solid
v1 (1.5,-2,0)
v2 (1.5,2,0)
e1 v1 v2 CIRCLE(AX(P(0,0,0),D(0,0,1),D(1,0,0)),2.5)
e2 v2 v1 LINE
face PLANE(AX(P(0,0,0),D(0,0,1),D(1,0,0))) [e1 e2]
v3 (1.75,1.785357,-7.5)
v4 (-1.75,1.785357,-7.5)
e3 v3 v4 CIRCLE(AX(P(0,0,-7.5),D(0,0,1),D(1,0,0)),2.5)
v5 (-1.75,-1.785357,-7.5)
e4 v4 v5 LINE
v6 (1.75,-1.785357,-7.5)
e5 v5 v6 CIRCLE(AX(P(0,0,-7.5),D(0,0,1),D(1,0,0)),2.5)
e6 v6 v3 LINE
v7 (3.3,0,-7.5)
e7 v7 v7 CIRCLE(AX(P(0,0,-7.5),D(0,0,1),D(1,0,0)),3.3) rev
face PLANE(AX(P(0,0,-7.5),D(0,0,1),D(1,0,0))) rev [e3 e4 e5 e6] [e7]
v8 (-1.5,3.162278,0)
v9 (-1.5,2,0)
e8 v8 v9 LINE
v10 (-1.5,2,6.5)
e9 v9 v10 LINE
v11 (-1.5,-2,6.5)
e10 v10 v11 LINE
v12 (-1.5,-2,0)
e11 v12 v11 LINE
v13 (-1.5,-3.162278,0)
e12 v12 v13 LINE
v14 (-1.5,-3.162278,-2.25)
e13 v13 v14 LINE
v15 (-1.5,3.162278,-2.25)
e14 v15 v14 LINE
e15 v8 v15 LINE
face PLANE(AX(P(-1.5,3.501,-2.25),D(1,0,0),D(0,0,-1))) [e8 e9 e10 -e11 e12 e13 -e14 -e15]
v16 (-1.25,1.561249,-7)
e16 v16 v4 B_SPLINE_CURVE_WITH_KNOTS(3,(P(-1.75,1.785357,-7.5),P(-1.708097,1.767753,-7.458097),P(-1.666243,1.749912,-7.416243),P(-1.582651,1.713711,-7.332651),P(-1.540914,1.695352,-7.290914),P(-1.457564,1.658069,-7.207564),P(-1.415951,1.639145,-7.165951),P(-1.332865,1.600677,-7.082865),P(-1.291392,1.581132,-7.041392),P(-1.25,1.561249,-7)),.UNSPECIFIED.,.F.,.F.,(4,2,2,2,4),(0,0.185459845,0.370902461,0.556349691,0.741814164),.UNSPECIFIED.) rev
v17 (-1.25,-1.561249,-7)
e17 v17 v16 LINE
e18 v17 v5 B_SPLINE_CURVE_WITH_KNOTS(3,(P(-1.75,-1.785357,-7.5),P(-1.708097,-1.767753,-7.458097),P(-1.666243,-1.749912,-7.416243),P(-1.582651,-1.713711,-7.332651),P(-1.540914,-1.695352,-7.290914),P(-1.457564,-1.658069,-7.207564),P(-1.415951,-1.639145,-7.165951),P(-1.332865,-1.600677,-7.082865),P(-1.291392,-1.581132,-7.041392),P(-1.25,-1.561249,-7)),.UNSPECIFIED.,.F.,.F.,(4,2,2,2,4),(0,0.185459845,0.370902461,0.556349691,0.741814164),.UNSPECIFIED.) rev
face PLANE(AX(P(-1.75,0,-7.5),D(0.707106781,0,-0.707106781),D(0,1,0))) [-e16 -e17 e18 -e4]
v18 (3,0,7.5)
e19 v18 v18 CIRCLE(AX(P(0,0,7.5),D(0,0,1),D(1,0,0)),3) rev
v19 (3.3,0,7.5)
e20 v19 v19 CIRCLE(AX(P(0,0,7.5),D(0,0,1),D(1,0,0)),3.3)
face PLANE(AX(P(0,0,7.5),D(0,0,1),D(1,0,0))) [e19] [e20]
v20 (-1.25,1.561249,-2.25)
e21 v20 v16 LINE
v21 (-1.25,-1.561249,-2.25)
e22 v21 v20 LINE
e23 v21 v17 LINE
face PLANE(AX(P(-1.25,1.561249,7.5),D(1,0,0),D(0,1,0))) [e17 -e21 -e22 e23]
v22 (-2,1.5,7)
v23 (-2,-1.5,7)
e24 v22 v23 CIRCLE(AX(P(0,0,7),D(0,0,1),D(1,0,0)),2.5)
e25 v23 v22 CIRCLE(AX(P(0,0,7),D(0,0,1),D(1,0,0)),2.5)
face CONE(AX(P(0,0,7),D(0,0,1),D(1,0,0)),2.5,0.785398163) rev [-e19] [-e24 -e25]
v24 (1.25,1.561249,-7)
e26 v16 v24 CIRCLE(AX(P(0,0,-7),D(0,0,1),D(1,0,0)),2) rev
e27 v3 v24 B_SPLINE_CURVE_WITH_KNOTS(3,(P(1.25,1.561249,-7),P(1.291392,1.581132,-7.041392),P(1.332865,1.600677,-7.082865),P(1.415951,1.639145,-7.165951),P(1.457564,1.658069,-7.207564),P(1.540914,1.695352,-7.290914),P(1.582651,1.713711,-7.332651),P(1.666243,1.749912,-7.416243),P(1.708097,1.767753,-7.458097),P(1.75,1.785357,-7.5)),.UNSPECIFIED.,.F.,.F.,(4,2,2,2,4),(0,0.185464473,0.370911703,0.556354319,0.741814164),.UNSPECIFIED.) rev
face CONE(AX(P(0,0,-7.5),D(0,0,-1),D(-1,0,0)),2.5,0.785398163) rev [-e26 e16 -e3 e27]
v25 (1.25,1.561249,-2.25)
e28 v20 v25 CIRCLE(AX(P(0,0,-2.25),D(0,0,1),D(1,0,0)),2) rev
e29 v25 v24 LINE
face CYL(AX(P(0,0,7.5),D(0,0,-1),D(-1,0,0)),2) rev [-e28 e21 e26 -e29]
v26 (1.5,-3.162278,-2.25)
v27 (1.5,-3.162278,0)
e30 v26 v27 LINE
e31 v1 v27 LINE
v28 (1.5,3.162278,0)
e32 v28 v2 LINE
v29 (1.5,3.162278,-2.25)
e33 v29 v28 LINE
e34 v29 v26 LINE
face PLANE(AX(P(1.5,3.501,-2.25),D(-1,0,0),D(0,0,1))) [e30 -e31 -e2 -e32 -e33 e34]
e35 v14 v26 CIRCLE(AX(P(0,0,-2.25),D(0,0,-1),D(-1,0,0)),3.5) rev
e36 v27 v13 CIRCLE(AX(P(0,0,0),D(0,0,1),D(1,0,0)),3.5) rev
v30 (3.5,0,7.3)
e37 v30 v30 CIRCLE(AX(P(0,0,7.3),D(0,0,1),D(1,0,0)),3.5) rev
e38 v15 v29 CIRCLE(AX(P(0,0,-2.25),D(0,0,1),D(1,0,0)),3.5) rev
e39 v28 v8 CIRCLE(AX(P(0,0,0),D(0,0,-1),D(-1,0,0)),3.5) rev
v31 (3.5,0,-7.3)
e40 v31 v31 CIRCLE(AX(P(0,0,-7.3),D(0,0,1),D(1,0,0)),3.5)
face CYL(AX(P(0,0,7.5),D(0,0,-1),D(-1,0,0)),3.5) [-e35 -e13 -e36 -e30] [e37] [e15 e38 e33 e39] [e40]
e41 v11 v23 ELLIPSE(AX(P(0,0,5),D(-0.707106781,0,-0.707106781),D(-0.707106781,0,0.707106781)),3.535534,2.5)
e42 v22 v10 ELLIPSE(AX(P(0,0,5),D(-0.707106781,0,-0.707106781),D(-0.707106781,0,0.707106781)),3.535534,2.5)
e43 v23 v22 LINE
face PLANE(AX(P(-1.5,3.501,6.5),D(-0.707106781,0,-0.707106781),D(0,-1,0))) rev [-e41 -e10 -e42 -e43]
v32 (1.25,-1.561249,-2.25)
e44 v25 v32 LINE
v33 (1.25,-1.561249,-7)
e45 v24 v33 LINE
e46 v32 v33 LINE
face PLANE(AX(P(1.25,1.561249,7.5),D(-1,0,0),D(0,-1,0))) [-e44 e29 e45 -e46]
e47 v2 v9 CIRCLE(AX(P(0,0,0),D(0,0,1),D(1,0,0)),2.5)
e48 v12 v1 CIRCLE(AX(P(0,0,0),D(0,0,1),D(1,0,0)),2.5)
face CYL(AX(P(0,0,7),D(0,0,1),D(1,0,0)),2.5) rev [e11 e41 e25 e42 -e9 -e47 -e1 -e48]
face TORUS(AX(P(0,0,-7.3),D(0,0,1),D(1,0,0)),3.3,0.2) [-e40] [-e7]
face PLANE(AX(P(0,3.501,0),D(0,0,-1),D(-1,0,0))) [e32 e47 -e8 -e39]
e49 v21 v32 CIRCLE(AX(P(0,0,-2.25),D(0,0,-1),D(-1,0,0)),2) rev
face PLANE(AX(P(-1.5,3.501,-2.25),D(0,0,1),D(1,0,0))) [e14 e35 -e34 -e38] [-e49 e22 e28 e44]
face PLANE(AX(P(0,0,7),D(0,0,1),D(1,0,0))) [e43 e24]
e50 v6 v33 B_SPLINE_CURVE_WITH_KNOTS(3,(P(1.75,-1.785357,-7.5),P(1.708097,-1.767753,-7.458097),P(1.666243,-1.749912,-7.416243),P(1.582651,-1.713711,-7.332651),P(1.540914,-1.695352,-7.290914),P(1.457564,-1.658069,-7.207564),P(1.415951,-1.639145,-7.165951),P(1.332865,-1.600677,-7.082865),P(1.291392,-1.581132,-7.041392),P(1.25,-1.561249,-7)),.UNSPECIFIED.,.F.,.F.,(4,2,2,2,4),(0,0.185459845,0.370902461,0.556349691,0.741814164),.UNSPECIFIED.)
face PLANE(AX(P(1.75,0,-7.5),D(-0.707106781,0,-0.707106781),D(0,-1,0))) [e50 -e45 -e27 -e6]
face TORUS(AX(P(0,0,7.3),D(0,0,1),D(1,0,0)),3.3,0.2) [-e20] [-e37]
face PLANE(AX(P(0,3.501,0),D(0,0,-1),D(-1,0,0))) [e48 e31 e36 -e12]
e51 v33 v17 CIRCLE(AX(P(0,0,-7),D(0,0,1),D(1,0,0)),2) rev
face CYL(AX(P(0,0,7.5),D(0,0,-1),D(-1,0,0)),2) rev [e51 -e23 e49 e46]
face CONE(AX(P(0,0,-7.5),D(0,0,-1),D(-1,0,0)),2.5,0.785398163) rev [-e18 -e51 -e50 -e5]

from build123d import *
from build123d.topology import SkipClean

# Parameters (mm, degrees)
EXTRUDE_1_DEPTH                 = 7.5
EXTRUDE_1_DEPTH_BACK            = 7.5
SKETCH_1_R                      = 3.5
CUT_EXTRUDE_1_REACH             = 10.986
CUT_EXTRUDE_1_DIRECTION_2_REACH = 10.986
FILLET_1_R                      = 0.2
SKETCH_3_R                      = 2.5
CUT_EXTRUDE_2_DEPTH             = 0.5
CUT_EXTRUDE_3_DEPTH             = 7
CHAMFER_1_SIZE                  = 0.5
CHAMFER_2_SIZE                  = 0.5


with BuildPart() as part:
    # 草图1 → 凸台-拉伸1 (new, two sides: drawn at the far end of the back side and taken through both)
    with BuildSketch(Plane.XY.offset(-EXTRUDE_1_DEPTH_BACK)):
        Circle(SKETCH_1_R)
        with BuildLine():
            Line((-1.25, 1.5612495), (-1.25, -1.5612495))
            ThreePointArc((-1.25, -1.5612495), (0, -2), (1.25, -1.5612495))
            Line((1.25, -1.5612495), (1.25, 1.5612495))
            ThreePointArc((1.25, 1.5612495), (0, 2), (-1.25, 1.5612495))
        make_face(mode=Mode.SUBTRACT)
    extrude(amount=EXTRUDE_1_DEPTH + EXTRUDE_1_DEPTH_BACK)

    # 草图2 → 切除-拉伸1 (cut, up to next)
    with BuildSketch(Plane(origin=(0, 0, 0), x_dir=(1, 0, 0), z_dir=(0, 1, 0)), mode=Mode.PRIVATE) as cut_extrude_1_sk1:
        Polygon((0, 0), (-1.5, 0), (-1.5, 2.25), (1.5, 2.25), (1.5, 0), align=None)
    cut_extrude_1_tool1 = extrude(cut_extrude_1_sk1.sketch, amount=-CUT_EXTRUDE_1_REACH, mode=Mode.PRIVATE) & part.part
    add(cut_extrude_1_tool1.solids().sort_by_distance((0, 0, -1.125))[0], mode=Mode.SUBTRACT)

    # 草图2 → 切除-拉伸1 direction 2 (cut, up to next)
    with BuildSketch(Plane(origin=(0, 0, 0), x_dir=(1, 0, 0), z_dir=(0, 1, 0)), mode=Mode.PRIVATE) as cut_extrude_1_direction_2_sk1:
        Polygon((0, 0), (-1.5, 0), (-1.5, 2.25), (1.5, 2.25), (1.5, 0), align=None)
    cut_extrude_1_direction_2_tool1 = extrude(cut_extrude_1_direction_2_sk1.sketch, amount=CUT_EXTRUDE_1_DIRECTION_2_REACH, mode=Mode.PRIVATE) & part.part
    add(cut_extrude_1_direction_2_tool1.solids().sort_by_distance((0, 0, -1.125))[0], mode=Mode.SUBTRACT)

    # 圆角1
    fillet_1_edges = [part.edges().sort_by_distance(p)[0] for p in [
        (-3.5, 0, -7.5),
        (-3.5, 0, 7.5),
    ]]
    fillet(fillet_1_edges, radius=FILLET_1_R)

    # 草图3 → 切除-拉伸2 (cut)
    with BuildSketch(Plane.XY.offset(7.5)):
        Circle(SKETCH_3_R)
    extrude(amount=-CUT_EXTRUDE_2_DEPTH, mode=Mode.SUBTRACT)

    # 草图4 → 切除-拉伸3 (cut)
    with SkipClean():  # the faces are left unmerged after this step: merging them gives an invalid solid
        with BuildSketch(Plane.XY.offset(7)):
            with BuildLine():
                Line((-1.5, 0), (-1.5, 2))
                ThreePointArc((-1.5, 2), (2.5, 0), (-1.5, -2))
                Line((-1.5, -2), (-1.5, 0))
            make_face()
        extrude(amount=-CUT_EXTRUDE_3_DEPTH, mode=Mode.SUBTRACT)

    # 倒角1
    # the kernel refuses this chamfer: 0.5 mm, written as the material it takes off along each edge
    with BuildSketch(Plane(origin=(0, 0, 7.5), x_dir=(1, 0, 0), z_dir=(0, -1, 0))) as chamfer_1_piece_1_section:
        Polygon((2.5 + CHAMFER_1_SIZE, 0), (2.5, -CHAMFER_1_SIZE), (2.5, 0), align=None)
    chamfer_1_piece_1 = revolve(axis=Axis((0, 0, 7.5), (0, 0, 1)), mode=Mode.PRIVATE)
    chamfer_1_piece_1 = split(chamfer_1_piece_1, bisect_by=Plane(origin=(-1.5, 2.458621217, 7.265320049), z_dir=(1, 0, 0)), keep=Keep.TOP, mode=Mode.PRIVATE)
    chamfer_1_piece_1 = split(chamfer_1_piece_1, bisect_by=Plane(origin=(1.229310608, 2.458621217, 7), z_dir=(0, 0, 1)), keep=Keep.TOP, mode=Mode.PRIVATE)
    add(chamfer_1_piece_1, mode=Mode.SUBTRACT)
    with BuildSketch(Plane(origin=(0, 0, 7.5), x_dir=(1, 0, 0), z_dir=(0, -1, 0))) as chamfer_1_piece_2_section:
        Polygon((2.5 + CHAMFER_1_SIZE, 0), (2.5, -CHAMFER_1_SIZE), (2.5, 0), align=None)
    chamfer_1_piece_2 = revolve(axis=Axis((0, 0, 7.5), (0, 0, 1)), mode=Mode.PRIVATE)
    chamfer_1_piece_2 = split(chamfer_1_piece_2, bisect_by=Plane(origin=(-1.5, 0, 7.263385129), z_dir=(-1, 0, 0)), keep=Keep.TOP, mode=Mode.PRIVATE)
    chamfer_1_piece_2 = split(chamfer_1_piece_2, bisect_by=Plane(origin=(-2.750757007, 0, 7), z_dir=(0, 0, 1)), keep=Keep.TOP, mode=Mode.PRIVATE)
    add(chamfer_1_piece_2, mode=Mode.SUBTRACT)
    with BuildSketch(Plane(origin=(-1.5, -3.285841494, 7), x_dir=(0.02749587661058651, 0, -0.9996219169112968), z_dir=(0, 1, 0))) as chamfer_1_piece_3_section:
        Polygon((CHAMFER_1_SIZE * 0.999621916911, CHAMFER_1_SIZE * 0.0274958766106), (-CHAMFER_1_SIZE * 0.0274958766106, CHAMFER_1_SIZE * 0.999621916911), (0, 0), align=None)
    chamfer_1_piece_3 = extrude(amount=6.571682988, mode=Mode.PRIVATE)
    chamfer_1_piece_3 = chamfer_1_piece_3 & Plane(origin=(0, 0, 6.830829646), x_dir=(-0.5999999999999999, 0.8, 0), z_dir=(0, 0, 1)) * Cylinder(2.5, 16, mode=Mode.PRIVATE)
    add(chamfer_1_piece_3, mode=Mode.SUBTRACT)

    # 倒角2
    chamfer_2_edges = [part.edges().sort_by_distance(p)[0] for p in [
        (-1.25, 0, -7.5),
        (0, -2, -7.5),
        (1.25, 0, -7.5),
        (0, 2, -7.5),
    ]]
    chamfer(chamfer_2_edges, length=CHAMFER_2_SIZE)


solid = part.part
